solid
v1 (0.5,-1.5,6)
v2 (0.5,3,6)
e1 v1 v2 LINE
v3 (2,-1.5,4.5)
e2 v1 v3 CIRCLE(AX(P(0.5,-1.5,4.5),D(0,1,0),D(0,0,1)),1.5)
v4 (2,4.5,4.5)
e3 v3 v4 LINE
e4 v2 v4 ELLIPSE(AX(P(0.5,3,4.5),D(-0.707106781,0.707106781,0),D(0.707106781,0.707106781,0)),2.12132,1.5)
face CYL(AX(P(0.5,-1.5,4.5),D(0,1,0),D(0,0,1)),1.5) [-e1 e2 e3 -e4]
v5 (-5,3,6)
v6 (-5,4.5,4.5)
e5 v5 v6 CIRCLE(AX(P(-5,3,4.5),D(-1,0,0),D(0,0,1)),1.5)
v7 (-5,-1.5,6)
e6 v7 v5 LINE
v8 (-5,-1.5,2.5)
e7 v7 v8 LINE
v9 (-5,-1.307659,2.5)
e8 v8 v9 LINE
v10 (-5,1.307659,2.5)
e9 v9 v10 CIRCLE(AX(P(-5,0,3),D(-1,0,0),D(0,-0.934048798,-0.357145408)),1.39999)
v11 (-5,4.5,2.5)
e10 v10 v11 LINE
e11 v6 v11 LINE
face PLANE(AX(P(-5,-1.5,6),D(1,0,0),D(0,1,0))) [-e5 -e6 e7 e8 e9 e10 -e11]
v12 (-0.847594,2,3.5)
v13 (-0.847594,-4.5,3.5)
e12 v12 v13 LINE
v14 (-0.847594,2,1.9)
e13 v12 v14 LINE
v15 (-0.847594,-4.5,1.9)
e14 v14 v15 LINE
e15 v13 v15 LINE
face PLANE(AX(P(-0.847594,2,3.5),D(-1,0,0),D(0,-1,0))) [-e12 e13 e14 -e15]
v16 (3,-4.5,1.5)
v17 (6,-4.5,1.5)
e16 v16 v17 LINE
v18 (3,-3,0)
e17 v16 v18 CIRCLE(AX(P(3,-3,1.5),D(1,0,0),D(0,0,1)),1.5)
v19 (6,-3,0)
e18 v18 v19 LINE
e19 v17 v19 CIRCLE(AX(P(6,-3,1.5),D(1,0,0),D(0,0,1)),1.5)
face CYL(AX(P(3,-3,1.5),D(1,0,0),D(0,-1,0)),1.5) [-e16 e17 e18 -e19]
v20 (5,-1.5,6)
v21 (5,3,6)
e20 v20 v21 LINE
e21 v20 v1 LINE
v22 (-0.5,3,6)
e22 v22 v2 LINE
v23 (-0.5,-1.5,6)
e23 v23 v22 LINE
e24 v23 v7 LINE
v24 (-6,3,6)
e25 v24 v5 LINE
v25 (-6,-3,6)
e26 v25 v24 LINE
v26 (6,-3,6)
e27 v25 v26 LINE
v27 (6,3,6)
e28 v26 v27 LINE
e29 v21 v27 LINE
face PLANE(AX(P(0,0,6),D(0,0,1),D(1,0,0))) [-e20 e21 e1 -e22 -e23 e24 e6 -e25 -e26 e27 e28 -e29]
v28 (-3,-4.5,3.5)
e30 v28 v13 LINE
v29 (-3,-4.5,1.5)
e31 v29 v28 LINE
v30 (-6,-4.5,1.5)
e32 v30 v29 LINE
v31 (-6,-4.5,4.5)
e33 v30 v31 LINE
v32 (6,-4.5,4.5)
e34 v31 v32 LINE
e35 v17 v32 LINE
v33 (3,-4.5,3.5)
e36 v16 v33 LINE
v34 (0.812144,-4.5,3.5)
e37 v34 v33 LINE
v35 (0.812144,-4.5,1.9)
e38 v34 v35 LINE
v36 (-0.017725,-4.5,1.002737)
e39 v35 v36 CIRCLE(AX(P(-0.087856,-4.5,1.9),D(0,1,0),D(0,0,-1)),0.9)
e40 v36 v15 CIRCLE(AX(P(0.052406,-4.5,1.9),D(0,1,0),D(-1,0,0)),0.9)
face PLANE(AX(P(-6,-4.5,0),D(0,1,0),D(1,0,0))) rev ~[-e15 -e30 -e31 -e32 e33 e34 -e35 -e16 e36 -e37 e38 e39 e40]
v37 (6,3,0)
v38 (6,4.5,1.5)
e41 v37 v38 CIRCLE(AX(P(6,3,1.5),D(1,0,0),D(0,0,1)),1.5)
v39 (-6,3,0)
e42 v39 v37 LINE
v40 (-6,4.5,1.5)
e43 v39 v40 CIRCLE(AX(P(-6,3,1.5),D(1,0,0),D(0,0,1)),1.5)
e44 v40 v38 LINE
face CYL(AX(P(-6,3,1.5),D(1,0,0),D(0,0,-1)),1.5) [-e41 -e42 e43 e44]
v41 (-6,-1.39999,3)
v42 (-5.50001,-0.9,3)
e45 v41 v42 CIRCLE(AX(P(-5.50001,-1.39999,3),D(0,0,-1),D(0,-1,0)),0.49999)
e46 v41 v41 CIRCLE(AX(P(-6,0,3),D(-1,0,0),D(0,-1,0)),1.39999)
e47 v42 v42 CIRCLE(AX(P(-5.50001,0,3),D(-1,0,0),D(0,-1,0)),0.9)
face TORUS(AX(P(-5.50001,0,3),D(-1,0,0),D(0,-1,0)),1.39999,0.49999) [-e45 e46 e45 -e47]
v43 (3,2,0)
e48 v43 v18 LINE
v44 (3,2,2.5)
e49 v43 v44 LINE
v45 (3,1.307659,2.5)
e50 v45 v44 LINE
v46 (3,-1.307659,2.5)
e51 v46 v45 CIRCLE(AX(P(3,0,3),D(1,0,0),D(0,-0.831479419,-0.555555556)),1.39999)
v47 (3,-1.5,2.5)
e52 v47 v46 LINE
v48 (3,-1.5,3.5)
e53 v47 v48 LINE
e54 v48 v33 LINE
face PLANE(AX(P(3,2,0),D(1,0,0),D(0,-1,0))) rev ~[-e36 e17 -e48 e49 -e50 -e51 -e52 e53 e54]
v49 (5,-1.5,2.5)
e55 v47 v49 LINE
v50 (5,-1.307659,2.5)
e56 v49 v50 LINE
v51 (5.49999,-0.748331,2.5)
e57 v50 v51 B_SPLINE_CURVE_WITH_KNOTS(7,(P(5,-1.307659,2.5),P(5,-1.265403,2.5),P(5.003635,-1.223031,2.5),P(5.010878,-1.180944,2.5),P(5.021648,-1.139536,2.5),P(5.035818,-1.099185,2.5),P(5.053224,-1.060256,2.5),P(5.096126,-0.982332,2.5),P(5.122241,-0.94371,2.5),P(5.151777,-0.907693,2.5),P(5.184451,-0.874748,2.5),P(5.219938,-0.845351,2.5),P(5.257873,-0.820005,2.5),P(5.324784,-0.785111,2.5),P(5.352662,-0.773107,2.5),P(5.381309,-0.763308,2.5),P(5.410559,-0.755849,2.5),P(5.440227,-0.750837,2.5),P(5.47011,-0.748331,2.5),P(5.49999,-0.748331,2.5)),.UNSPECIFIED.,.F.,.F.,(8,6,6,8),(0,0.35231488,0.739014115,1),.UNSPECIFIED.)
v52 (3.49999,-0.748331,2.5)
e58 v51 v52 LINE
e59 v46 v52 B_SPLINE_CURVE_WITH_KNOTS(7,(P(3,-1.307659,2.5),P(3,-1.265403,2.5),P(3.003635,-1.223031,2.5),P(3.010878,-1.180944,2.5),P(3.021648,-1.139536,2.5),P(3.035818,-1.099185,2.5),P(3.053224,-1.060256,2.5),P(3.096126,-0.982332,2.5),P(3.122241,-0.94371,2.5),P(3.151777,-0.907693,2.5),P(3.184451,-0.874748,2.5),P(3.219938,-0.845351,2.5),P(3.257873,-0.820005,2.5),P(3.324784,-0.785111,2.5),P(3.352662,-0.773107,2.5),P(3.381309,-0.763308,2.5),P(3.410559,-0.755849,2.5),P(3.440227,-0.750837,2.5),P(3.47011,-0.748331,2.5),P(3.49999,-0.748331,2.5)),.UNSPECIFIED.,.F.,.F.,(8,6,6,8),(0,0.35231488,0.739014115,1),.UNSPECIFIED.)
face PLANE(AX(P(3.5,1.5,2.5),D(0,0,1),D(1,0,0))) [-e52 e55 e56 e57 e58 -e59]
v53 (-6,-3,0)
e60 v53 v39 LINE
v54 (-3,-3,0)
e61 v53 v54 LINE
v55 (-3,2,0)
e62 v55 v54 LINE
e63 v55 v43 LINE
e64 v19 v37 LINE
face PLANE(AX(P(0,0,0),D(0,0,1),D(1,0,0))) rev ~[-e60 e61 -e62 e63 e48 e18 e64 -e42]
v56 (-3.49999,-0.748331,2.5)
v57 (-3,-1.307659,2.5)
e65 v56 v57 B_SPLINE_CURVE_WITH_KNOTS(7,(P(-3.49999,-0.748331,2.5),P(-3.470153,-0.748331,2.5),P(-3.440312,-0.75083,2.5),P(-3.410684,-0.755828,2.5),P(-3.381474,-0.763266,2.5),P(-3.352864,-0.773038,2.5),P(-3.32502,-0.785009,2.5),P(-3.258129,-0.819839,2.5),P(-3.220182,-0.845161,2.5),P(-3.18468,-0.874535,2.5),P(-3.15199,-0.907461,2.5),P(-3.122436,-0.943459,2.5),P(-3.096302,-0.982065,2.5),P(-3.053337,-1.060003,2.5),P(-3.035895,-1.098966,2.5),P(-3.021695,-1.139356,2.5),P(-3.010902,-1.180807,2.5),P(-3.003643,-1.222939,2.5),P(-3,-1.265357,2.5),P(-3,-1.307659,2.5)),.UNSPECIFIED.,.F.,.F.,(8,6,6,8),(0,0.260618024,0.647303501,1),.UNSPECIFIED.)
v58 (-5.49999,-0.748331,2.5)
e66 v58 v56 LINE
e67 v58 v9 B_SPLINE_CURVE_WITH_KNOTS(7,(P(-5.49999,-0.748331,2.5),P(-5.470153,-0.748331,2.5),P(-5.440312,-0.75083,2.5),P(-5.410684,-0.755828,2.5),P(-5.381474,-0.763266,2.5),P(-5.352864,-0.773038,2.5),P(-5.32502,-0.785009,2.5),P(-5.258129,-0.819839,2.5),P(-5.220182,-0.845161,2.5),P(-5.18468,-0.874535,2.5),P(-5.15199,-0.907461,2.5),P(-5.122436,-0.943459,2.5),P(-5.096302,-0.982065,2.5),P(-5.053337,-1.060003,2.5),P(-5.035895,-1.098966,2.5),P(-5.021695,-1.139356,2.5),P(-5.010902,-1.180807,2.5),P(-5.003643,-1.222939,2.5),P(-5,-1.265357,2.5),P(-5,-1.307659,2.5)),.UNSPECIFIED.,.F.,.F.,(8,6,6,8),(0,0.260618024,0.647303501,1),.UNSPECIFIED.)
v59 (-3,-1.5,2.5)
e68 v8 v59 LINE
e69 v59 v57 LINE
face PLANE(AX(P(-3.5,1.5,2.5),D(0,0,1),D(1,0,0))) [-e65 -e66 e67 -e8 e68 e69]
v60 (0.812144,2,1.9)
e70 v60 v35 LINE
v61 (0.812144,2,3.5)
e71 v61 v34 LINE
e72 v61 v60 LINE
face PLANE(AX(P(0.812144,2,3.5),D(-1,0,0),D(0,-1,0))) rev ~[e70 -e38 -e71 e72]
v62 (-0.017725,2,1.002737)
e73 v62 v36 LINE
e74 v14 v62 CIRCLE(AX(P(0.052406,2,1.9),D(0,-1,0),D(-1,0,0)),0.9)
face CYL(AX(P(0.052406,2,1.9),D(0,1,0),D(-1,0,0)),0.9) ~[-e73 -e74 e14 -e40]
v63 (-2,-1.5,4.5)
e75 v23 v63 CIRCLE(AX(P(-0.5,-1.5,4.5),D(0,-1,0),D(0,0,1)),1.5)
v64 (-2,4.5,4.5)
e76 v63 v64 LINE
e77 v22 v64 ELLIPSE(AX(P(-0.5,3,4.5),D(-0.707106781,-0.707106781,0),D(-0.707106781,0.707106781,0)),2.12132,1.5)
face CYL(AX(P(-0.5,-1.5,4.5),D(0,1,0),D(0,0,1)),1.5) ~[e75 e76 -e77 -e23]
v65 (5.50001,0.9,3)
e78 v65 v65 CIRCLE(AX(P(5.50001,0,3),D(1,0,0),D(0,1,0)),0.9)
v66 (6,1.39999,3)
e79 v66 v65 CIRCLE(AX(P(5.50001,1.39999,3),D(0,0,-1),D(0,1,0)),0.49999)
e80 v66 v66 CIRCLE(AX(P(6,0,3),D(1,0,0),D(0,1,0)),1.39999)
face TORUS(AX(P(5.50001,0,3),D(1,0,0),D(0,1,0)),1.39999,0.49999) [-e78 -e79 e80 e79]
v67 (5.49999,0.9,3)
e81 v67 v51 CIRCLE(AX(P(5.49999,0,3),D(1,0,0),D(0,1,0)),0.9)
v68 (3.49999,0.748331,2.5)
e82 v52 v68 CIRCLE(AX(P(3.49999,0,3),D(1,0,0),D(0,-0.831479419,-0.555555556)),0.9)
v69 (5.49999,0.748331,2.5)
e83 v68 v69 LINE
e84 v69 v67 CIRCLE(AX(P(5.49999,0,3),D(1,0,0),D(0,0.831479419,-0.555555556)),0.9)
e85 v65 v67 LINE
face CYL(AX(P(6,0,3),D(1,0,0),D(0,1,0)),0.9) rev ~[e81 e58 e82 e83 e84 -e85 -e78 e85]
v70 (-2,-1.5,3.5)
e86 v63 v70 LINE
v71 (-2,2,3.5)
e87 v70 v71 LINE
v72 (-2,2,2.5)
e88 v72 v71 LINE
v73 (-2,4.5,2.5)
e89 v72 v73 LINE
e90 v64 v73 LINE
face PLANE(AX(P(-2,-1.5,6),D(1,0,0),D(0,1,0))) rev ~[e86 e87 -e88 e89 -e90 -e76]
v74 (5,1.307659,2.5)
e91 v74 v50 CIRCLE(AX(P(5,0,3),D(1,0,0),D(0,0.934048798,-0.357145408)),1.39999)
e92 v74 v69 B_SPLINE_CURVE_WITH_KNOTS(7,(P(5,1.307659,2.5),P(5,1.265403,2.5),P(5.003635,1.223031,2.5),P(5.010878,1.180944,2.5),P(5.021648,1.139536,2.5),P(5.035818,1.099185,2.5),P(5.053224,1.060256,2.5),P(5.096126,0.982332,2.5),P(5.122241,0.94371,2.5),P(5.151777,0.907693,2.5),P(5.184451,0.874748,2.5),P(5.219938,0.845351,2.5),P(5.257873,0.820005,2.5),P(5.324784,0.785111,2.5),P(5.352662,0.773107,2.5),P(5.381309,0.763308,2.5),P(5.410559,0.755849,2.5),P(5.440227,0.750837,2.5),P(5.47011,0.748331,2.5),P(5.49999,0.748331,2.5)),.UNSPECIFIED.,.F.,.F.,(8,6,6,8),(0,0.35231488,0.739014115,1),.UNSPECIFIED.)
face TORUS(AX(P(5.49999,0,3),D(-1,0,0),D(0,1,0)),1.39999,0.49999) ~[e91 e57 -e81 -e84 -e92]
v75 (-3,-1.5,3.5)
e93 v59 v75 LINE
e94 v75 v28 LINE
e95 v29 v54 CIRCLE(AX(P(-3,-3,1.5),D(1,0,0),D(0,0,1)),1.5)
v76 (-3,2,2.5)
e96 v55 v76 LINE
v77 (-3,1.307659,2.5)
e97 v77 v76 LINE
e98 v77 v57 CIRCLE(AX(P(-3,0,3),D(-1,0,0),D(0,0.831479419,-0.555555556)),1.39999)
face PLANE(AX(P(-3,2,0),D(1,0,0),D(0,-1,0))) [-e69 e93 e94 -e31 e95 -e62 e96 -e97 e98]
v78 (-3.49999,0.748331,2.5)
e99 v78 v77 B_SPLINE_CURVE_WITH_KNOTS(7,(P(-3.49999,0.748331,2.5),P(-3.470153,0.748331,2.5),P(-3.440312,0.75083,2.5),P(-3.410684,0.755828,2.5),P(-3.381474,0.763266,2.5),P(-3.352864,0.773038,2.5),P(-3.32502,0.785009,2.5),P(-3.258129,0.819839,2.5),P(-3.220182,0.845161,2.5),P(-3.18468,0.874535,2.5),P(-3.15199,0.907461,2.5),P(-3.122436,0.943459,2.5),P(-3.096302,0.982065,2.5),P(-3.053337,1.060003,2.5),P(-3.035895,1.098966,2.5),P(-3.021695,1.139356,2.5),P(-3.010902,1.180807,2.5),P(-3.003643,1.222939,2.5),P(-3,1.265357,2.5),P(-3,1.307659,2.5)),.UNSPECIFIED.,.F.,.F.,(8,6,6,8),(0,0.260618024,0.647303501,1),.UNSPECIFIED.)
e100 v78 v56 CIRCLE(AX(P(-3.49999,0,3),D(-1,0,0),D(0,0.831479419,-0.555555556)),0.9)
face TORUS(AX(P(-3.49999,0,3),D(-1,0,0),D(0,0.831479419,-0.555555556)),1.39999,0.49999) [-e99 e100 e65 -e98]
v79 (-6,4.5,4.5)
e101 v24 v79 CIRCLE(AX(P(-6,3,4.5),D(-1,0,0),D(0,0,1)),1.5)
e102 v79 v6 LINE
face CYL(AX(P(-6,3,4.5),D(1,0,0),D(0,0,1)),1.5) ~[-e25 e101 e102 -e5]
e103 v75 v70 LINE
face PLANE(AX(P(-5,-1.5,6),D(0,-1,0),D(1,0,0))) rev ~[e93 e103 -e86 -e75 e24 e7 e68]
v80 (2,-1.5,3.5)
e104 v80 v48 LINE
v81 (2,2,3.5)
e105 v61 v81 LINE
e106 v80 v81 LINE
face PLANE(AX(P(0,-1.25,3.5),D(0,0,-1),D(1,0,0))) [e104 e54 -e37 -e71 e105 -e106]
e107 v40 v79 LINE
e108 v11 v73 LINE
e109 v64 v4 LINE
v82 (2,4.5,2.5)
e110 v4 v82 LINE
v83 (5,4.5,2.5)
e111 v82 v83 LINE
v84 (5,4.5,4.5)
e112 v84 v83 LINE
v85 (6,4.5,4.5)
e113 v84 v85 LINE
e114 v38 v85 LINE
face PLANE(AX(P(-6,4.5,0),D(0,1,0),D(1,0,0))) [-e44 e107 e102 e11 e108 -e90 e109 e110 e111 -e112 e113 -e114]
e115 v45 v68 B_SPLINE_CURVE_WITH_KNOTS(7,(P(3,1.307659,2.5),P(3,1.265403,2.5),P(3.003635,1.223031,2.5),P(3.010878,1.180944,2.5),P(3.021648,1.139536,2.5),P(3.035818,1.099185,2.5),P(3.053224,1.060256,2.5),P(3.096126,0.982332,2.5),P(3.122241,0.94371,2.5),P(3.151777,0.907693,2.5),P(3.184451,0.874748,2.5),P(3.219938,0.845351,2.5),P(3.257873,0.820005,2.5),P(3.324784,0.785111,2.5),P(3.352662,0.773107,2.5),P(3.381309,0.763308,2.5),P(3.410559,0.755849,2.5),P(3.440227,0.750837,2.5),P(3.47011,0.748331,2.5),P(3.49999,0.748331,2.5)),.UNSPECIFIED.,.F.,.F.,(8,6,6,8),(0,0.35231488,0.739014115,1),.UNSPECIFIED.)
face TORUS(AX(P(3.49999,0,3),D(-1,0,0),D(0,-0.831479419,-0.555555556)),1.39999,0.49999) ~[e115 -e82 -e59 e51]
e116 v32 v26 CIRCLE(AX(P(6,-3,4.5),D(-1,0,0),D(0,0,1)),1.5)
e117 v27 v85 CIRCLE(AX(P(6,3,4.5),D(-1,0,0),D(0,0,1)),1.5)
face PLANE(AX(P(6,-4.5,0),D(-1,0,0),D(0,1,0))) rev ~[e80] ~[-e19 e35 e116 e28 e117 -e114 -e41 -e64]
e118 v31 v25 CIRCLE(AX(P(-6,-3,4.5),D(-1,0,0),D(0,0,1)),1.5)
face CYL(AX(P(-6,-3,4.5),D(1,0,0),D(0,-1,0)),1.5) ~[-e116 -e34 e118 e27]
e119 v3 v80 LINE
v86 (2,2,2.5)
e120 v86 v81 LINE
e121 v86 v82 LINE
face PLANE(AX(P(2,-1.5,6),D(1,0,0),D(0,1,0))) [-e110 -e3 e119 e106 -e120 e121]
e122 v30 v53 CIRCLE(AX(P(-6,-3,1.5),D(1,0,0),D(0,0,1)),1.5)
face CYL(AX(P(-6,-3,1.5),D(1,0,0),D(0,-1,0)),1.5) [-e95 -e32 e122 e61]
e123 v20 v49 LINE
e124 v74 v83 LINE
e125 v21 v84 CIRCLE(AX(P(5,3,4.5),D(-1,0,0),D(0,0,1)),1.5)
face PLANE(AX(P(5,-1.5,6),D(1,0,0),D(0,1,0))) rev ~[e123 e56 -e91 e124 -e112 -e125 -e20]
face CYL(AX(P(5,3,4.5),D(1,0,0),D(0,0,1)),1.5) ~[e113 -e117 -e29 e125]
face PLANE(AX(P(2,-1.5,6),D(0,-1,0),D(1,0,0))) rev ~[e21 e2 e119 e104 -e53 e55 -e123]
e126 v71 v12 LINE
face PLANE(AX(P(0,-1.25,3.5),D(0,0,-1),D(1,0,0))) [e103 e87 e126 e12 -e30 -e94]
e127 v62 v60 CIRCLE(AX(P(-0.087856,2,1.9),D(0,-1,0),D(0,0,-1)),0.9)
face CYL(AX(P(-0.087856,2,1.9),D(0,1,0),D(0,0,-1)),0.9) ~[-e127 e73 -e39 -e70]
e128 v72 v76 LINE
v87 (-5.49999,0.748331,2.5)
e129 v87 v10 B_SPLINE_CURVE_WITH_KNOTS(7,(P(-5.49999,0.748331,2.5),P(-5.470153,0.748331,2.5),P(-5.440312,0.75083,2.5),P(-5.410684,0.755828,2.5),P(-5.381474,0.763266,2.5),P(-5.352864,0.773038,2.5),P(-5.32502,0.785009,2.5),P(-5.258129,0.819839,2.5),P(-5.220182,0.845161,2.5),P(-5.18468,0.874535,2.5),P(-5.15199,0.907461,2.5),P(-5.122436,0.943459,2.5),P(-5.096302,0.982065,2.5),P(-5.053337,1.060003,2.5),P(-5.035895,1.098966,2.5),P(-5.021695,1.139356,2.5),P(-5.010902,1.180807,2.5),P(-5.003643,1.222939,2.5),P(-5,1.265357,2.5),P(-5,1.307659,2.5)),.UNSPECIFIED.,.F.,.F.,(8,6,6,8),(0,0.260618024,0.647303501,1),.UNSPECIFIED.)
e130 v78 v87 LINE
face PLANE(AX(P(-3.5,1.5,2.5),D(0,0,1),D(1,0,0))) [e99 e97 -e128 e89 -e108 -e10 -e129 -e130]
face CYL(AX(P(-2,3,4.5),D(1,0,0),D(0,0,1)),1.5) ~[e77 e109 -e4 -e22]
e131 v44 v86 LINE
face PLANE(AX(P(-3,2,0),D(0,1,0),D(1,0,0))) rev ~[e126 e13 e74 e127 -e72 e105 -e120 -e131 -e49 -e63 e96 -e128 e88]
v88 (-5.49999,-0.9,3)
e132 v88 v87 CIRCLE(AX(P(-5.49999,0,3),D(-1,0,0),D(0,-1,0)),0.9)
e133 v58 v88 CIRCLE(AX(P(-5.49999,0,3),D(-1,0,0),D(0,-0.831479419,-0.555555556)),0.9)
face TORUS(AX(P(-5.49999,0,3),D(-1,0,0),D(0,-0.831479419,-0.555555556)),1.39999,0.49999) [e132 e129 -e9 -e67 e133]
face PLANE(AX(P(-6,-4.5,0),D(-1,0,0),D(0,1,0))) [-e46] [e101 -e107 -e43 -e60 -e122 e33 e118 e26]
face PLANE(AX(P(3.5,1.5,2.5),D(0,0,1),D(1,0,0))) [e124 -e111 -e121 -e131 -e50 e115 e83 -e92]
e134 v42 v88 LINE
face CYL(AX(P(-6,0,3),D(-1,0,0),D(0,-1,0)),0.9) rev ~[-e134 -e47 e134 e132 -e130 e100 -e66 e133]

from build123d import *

# Parameters (mm, degrees)
F0_W         = 12
F0_H         = 9
F1_DEPTH     = 6
F2_W         = 3
F2_H         = 6
F3_DEPTH     = 3.5
F4_W         = 6
F4_H         = 6.5
F5_DEPTH     = 3.5
F6_R         = 0.9
F7_DEPTH     = 3
F8_R         = 0.9
F9_DEPTH     = 3.001
F10_R        = 1.5
F11_W        = 1.6597382491
F11_H        = 6.5
F12_DEPTH    = 2.5
F13_T1_DEPTH = 8.75
F14_R        = 0.49999


# Not quite as in the source:
# - a fillet or chamfer that OpenCascade refuses, or shapes differently, is made with other operations: its cross-section is extruded or revolved along the edge and cut away or added
# - a fillet or chamfer is up to 0.001 mm smaller than in the source, because OpenCascade refuses the exact size


with BuildPart() as f1:
    # F0 (on Top) → F1 (new body)
    with BuildSketch(Plane.XY):
        Rectangle(F0_W, F0_H)
    extrude(amount=F1_DEPTH)

    # F2 (on face) → F3 (cut)
    with BuildSketch(Plane.XY.offset(6)):
        with Locations((3.5, 1.5)):
            Rectangle(F2_W, F2_H)
        with Locations((-3.5, 1.5)):
            Rectangle(F2_W, F2_H)
    extrude(amount=-F3_DEPTH, mode=Mode.SUBTRACT)

    # F4 (on face) → F5 (cut)
    with BuildSketch(Plane(origin=(0, 0, 0), x_dir=(1, 0, 0), z_dir=(0, 0, -1))):
        with Locations((0, 1.25)):
            Rectangle(F4_W, F4_H)
    extrude(amount=-F5_DEPTH, mode=Mode.SUBTRACT)

    # F6 (on face) → F7 (cut)
    with BuildSketch(Plane.YZ.offset(6)):
        with Locations((0, 3)):
            Circle(F6_R)
    extrude(amount=-F7_DEPTH, mode=Mode.SUBTRACT)

    # F8 (on face) → F9 (cut, through all)
    with BuildSketch(Plane(origin=(-6, 0, 0), x_dir=(0, -1, 0), z_dir=(-1, 0, 0))):
        with Locations((0, 3)):
            Circle(F8_R)
    extrude(amount=-F9_DEPTH, mode=Mode.SUBTRACT)

    # F10
    f10_edges = [f1.edges().sort_by_distance(p)[0] for p in [
        (2, 1.5, 6),
        (-2, 1.5, 6),
        (0, -4.5, 6),
        (-4.5, -4.5, 0),
        (4.5, -4.5, 0),
        (0, 4.5, 0),
        (-5.5, 4.5, 6),
        (5.5, 4.5, 6),
        (0, 4.5, 6),
    ]]
    fillet(f10_edges, radius=F10_R)

    # F11 (on face) → F12 (join)
    with BuildSketch(Plane(origin=(0, 0, 3.5), x_dir=(1, 0, 0), z_dir=(0, 0, -1))):
        with Locations((-0.017724873, 1.25)):
            Rectangle(F11_W, F11_H)
    extrude(amount=F12_DEPTH)

    # F13: fillet of radius 0.9 on 2 edges, made by hand

    # F13_s2 → F13_t1 (cut)
    with BuildSketch(Plane.XZ.offset(-2)):
        with BuildLine():
            ThreePointArc((-0.0878557485, 1), (0.5485403546, 1.2636038969), (0.8121442515, 1.9))
            Line((0.8121442515, 1.9), (0.8121442515, 1))
            Line((0.8121442515, 1), (-0.0878557485, 1))
        make_face()
        with BuildLine():
            ThreePointArc((-0.8475939976, 1.9), (-0.5839901007, 1.2636038969), (0.0524060024, 1))
            Line((0.0524060024, 1), (-0.8475939976, 1))
            Line((-0.8475939976, 1), (-0.8475939976, 1.9))
        make_face()
    extrude(amount=F13_T1_DEPTH, mode=Mode.SUBTRACT)

    # F14 (radius 0.5 in the source; OpenCascade refuses exactly that, so slightly less here)
    f14_edges = [f1.edges().sort_by_distance(p)[0] for p in [
        (6, -0.9, 3),
        (-6, 0.9, 3),
        (-3, 0, 2.1),
        (5, 0.861249, 2.738751),
        (5, -0.261249, 3.861249),
        (3, 0, 2.1),
        (-5, -0.861249, 2.738751),
        (-5, 0.261249, 3.861249),
    ]]
    fillet(f14_edges, radius=F14_R)


solid = f1.part
